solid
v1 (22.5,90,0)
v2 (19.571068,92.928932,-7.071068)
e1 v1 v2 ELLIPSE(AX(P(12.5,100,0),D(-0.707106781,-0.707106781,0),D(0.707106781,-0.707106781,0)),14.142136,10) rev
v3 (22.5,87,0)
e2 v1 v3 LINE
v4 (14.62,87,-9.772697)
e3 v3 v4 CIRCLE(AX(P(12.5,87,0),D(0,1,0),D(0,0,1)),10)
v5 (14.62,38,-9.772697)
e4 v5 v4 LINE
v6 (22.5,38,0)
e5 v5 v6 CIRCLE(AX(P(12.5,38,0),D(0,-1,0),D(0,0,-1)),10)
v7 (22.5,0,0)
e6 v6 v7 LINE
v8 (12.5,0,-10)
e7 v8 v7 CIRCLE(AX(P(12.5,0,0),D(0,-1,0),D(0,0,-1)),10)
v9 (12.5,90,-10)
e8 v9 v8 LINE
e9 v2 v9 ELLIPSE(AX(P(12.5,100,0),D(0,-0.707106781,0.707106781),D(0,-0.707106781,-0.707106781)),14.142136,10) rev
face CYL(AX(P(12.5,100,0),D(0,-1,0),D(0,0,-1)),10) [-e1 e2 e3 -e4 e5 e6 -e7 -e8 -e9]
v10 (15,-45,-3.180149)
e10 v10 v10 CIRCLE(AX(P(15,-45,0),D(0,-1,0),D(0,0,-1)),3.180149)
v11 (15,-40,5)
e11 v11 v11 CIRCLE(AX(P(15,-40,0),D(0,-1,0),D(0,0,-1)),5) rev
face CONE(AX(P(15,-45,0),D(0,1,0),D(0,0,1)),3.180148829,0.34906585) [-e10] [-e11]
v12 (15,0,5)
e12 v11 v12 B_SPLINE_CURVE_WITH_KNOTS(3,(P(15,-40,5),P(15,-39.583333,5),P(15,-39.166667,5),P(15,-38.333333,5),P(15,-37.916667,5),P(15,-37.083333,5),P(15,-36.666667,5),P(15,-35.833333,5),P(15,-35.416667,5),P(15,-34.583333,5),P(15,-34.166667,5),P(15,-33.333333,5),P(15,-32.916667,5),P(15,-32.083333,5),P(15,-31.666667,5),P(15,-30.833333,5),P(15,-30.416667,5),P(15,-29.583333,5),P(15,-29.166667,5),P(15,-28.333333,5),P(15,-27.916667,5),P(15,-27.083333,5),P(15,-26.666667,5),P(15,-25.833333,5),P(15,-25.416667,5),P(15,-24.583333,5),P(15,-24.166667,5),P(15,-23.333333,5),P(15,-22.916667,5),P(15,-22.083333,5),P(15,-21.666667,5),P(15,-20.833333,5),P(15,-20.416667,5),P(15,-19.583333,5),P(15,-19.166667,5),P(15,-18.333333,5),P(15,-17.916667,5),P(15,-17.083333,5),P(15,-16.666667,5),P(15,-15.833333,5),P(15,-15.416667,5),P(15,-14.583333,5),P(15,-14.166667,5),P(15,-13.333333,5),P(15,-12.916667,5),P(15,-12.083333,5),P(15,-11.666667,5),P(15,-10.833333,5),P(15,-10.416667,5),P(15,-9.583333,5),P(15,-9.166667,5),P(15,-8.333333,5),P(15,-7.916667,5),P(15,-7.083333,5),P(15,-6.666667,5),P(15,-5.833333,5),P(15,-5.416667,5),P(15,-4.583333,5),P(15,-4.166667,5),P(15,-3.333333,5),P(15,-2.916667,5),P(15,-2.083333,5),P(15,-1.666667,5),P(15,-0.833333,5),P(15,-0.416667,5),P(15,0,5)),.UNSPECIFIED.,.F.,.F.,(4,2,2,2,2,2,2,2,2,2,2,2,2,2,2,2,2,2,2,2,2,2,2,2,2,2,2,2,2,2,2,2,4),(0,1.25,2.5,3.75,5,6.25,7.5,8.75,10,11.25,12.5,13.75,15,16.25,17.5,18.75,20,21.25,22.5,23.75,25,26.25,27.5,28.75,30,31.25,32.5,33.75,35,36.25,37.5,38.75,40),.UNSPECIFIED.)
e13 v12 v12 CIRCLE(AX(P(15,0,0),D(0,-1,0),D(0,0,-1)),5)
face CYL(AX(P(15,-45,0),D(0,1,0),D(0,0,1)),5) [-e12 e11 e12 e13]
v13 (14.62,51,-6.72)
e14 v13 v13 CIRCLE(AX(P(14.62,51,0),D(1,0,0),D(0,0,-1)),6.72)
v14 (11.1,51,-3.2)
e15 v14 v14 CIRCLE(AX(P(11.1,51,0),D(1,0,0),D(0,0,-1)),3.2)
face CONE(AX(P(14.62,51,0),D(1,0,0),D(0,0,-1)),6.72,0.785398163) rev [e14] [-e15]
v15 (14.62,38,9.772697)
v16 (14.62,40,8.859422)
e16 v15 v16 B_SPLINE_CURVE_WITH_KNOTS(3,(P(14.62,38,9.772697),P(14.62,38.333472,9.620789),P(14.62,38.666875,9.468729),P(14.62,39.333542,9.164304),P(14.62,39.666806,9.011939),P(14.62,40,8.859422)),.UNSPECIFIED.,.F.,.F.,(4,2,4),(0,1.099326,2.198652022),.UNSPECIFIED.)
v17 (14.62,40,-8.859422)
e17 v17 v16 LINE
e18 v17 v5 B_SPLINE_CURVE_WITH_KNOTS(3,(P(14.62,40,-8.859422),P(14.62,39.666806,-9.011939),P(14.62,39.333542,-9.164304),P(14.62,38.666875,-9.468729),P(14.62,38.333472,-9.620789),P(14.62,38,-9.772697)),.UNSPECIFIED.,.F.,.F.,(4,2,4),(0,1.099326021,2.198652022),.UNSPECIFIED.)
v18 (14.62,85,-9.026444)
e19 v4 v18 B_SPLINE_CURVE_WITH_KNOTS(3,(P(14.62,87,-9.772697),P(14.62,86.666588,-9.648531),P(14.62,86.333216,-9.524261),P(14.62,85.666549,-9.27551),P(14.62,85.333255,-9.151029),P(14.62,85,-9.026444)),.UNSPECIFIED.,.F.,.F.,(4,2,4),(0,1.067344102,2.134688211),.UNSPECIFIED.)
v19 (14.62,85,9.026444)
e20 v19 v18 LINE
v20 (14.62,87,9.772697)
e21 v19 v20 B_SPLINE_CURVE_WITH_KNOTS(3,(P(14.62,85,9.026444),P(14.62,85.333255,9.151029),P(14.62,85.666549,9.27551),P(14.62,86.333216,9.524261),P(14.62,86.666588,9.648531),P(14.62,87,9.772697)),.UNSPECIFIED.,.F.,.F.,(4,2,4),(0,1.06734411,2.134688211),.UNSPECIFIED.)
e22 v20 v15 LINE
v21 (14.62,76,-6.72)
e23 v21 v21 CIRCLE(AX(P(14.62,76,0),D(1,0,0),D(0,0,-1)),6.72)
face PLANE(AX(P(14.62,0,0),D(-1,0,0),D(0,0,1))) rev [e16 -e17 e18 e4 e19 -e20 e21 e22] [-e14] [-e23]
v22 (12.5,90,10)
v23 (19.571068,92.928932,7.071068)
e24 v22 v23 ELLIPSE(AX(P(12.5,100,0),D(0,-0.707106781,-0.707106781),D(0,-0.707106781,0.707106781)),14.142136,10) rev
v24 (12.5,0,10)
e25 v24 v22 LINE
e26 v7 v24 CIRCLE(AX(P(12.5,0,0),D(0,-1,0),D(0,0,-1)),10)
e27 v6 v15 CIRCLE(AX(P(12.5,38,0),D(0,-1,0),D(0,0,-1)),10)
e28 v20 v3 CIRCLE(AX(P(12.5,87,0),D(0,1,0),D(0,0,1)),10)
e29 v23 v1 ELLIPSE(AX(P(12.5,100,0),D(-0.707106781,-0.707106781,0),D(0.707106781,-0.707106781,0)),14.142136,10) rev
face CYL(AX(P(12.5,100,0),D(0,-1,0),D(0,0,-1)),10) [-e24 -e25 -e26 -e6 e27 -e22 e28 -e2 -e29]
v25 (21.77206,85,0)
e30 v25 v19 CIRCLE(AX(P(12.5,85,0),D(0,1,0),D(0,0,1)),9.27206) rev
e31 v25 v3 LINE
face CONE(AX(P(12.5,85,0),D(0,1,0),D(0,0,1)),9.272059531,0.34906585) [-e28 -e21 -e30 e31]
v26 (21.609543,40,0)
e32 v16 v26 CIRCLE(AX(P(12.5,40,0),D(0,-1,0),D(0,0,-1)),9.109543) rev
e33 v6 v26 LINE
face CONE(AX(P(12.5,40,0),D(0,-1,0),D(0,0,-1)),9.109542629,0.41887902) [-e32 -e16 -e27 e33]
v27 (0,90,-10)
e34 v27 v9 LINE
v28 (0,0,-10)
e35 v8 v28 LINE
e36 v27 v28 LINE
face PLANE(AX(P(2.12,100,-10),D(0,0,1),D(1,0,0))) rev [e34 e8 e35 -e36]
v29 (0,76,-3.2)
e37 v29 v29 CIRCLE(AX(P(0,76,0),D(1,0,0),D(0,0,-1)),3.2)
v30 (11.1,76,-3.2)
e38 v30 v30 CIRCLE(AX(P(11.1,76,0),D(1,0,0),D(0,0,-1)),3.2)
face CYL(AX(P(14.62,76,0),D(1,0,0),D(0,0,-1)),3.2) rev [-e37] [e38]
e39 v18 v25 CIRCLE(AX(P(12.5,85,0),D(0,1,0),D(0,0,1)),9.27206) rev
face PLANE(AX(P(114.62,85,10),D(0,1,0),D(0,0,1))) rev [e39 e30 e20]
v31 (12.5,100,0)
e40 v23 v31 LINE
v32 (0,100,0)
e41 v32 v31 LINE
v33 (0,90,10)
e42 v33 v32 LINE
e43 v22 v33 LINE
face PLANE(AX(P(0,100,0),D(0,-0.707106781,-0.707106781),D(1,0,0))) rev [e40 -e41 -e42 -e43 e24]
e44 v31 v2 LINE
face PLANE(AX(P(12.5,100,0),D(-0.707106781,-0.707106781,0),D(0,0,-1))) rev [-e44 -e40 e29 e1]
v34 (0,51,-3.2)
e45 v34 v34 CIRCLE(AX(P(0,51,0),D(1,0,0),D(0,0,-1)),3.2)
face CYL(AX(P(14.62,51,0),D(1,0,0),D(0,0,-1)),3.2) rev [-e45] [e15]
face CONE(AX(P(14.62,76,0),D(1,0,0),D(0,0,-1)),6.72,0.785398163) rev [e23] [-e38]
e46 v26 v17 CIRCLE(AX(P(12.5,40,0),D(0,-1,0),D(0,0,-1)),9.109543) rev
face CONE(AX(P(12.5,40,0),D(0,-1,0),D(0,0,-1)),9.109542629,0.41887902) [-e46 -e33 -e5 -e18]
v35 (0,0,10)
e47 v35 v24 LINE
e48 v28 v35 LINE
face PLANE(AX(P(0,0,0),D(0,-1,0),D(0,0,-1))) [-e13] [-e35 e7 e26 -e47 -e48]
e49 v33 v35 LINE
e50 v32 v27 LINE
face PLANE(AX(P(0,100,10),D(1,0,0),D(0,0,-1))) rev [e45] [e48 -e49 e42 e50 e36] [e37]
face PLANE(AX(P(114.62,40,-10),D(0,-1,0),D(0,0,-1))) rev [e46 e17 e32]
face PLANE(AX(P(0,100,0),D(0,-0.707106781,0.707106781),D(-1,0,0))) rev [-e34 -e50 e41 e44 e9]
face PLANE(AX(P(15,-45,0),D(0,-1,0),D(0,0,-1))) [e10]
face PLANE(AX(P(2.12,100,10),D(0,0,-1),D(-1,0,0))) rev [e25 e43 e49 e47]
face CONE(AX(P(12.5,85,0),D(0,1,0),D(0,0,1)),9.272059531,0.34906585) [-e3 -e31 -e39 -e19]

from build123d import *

# Parameters (mm, degrees)
DODANIE_WYCI_GNI_CIE1_DEPTH                        = 100
SFAZOWANIE1_SIZE                                   = 10
ZAOKR_GLENIE1_R                                    = 10
SZKIC3_W                                           = 20
SZKIC3_H                                           = 45
WYTNIJ_WYCI_GNI_CIE1_DEPTH                         = 100
SFAZOWANIE2_SIZE2                                  = 0.890457371
SFAZOWANIE2_SIZE                                   = 2
SFAZOWANIE3_SIZE2                                  = 0.727940469
SFAZOWANIE3_SIZE                                   = 2
POG_BIENIE_STO_KOWE_POD_M6_WKR_T_Z_BEM_D           = 6.4
POG_BIENIE_STO_KOWE_POD_M6_WKR_T_Z_BEM_DEPTH       = 40
POG_BIENIE_STO_KOWE_POD_M6_WKR_T_Z_BEM_CSINK_D     = 13.44
POG_BIENIE_STO_KOWE_POD_M6_WKR_T_Z_BEM_CSINK_ANGLE = 90
POG_BIENIE_STO_KOWE_POD_M6_WKR_T_Z_BEM_TIP         = 1.922753981
SZKIC7_R                                           = 5
DODANIE_WYCI_GNI_CIE2_DEPTH                        = 45
SFAZOWANIE5_SIZE                                   = 5
SFAZOWANIE5_SIZE2                                  = 1.819851171


with BuildPart() as part:
    # Szkic2 → Dodanie-wyciągnięcie1 (new body)
    with BuildSketch(Plane(origin=(0, 0, 0), x_dir=(1, 0, 0), z_dir=(0, 1, 0))):
        Polygon((2.12, 10), (22.5, 10), (22.5, -10), (2.12, -10), (0, -10), (0, 10), align=None)
    extrude(amount=DODANIE_WYCI_GNI_CIE1_DEPTH)

    # Sfazowanie1
    sfazowanie1_edges = [part.edges().sort_by_distance(p)[0] for p in [
        (11.25, 100, -10),
        (22.5, 100, 0),
        (11.25, 100, 10),
    ]]
    chamfer(sfazowanie1_edges, length=SFAZOWANIE1_SIZE - 0.0001)  # a hair under: the kernel refuses the full size

    # Zaokrąglenie1
    zaokr_glenie1_edges = [part.edges().sort_by_distance(p)[0] for p in [
        (22.5, 45.00005, -10),
        (22.5, 45.00005, 10),
    ]]
    fillet(zaokr_glenie1_edges, radius=ZAOKR_GLENIE1_R - 0.0001)  # a hair under: the kernel refuses the full size

    # Szkic3 → Wytnij-wyciągnięcie1 (cut)
    with BuildSketch(Plane(origin=(14.62, 0, 0), x_dir=(0, 0, -1), z_dir=(1, 0, 0))):
        with Locations((0, 62.5)):
            Rectangle(SZKIC3_W, SZKIC3_H)
    extrude(amount=WYTNIJ_WYCI_GNI_CIE1_DEPTH, mode=Mode.SUBTRACT)

    # Sfazowanie2
    sfazowanie2_edges = [part.edges().sort_by_distance(p)[0] for p in [
        (20.28459703, 40, -6.277010546),
        (20.28459703, 40, 6.277010546),
    ]]
    chamfer(sfazowanie2_edges, length=SFAZOWANIE2_SIZE, length2=SFAZOWANIE2_SIZE2)

    # Sfazowanie3
    sfazowanie3_edges = [part.edges().sort_by_distance(p)[0] for p in [
        (20.28459703, 85, -6.277010546),
        (20.28459703, 85, 6.277010546),
    ]]
    chamfer(sfazowanie3_edges, length=SFAZOWANIE3_SIZE, length2=SFAZOWANIE3_SIZE2)

    # Pogłębienie stożkowe pod M6 Wkręt z łbem stożkowym płaskim2
    with Locations(Plane(origin=(14.62, 0, 0), x_dir=(0, 0, -1), z_dir=(1, 0, 0))):
        with Locations((0, 51), (0, 76)):
            CounterSinkHole(POG_BIENIE_STO_KOWE_POD_M6_WKR_T_Z_BEM_D / 2, POG_BIENIE_STO_KOWE_POD_M6_WKR_T_Z_BEM_CSINK_D / 2, depth=POG_BIENIE_STO_KOWE_POD_M6_WKR_T_Z_BEM_DEPTH, counter_sink_angle=POG_BIENIE_STO_KOWE_POD_M6_WKR_T_Z_BEM_CSINK_ANGLE)
            with Locations((0, 0, -(POG_BIENIE_STO_KOWE_POD_M6_WKR_T_Z_BEM_DEPTH + POG_BIENIE_STO_KOWE_POD_M6_WKR_T_Z_BEM_TIP / 2))):  # 118° drill point
                Cone(0, POG_BIENIE_STO_KOWE_POD_M6_WKR_T_Z_BEM_D / 2, POG_BIENIE_STO_KOWE_POD_M6_WKR_T_Z_BEM_TIP, mode=Mode.SUBTRACT)

    # Szkic7 → Dodanie-wyciągnięcie2 (add)
    with BuildSketch(Plane.XZ):
        with Locations(Location((15, 0, 0), (0, 0, 90))):
            Circle(SZKIC7_R)
    extrude(amount=DODANIE_WYCI_GNI_CIE2_DEPTH)

    # Sfazowanie5
    sfazowanie5_edges = [part.edges().sort_by_distance(p)[0] for p in [
        (15, -45, -5),
    ]]
    sfazowanie5_side = [part.faces().sort_by_distance(p)[0] for p in [
        (15, -22.5, -5),
    ]]
    chamfer(sfazowanie5_edges, length=SFAZOWANIE5_SIZE, length2=SFAZOWANIE5_SIZE2, reference=sfazowanie5_side[0])


solid = part.part
